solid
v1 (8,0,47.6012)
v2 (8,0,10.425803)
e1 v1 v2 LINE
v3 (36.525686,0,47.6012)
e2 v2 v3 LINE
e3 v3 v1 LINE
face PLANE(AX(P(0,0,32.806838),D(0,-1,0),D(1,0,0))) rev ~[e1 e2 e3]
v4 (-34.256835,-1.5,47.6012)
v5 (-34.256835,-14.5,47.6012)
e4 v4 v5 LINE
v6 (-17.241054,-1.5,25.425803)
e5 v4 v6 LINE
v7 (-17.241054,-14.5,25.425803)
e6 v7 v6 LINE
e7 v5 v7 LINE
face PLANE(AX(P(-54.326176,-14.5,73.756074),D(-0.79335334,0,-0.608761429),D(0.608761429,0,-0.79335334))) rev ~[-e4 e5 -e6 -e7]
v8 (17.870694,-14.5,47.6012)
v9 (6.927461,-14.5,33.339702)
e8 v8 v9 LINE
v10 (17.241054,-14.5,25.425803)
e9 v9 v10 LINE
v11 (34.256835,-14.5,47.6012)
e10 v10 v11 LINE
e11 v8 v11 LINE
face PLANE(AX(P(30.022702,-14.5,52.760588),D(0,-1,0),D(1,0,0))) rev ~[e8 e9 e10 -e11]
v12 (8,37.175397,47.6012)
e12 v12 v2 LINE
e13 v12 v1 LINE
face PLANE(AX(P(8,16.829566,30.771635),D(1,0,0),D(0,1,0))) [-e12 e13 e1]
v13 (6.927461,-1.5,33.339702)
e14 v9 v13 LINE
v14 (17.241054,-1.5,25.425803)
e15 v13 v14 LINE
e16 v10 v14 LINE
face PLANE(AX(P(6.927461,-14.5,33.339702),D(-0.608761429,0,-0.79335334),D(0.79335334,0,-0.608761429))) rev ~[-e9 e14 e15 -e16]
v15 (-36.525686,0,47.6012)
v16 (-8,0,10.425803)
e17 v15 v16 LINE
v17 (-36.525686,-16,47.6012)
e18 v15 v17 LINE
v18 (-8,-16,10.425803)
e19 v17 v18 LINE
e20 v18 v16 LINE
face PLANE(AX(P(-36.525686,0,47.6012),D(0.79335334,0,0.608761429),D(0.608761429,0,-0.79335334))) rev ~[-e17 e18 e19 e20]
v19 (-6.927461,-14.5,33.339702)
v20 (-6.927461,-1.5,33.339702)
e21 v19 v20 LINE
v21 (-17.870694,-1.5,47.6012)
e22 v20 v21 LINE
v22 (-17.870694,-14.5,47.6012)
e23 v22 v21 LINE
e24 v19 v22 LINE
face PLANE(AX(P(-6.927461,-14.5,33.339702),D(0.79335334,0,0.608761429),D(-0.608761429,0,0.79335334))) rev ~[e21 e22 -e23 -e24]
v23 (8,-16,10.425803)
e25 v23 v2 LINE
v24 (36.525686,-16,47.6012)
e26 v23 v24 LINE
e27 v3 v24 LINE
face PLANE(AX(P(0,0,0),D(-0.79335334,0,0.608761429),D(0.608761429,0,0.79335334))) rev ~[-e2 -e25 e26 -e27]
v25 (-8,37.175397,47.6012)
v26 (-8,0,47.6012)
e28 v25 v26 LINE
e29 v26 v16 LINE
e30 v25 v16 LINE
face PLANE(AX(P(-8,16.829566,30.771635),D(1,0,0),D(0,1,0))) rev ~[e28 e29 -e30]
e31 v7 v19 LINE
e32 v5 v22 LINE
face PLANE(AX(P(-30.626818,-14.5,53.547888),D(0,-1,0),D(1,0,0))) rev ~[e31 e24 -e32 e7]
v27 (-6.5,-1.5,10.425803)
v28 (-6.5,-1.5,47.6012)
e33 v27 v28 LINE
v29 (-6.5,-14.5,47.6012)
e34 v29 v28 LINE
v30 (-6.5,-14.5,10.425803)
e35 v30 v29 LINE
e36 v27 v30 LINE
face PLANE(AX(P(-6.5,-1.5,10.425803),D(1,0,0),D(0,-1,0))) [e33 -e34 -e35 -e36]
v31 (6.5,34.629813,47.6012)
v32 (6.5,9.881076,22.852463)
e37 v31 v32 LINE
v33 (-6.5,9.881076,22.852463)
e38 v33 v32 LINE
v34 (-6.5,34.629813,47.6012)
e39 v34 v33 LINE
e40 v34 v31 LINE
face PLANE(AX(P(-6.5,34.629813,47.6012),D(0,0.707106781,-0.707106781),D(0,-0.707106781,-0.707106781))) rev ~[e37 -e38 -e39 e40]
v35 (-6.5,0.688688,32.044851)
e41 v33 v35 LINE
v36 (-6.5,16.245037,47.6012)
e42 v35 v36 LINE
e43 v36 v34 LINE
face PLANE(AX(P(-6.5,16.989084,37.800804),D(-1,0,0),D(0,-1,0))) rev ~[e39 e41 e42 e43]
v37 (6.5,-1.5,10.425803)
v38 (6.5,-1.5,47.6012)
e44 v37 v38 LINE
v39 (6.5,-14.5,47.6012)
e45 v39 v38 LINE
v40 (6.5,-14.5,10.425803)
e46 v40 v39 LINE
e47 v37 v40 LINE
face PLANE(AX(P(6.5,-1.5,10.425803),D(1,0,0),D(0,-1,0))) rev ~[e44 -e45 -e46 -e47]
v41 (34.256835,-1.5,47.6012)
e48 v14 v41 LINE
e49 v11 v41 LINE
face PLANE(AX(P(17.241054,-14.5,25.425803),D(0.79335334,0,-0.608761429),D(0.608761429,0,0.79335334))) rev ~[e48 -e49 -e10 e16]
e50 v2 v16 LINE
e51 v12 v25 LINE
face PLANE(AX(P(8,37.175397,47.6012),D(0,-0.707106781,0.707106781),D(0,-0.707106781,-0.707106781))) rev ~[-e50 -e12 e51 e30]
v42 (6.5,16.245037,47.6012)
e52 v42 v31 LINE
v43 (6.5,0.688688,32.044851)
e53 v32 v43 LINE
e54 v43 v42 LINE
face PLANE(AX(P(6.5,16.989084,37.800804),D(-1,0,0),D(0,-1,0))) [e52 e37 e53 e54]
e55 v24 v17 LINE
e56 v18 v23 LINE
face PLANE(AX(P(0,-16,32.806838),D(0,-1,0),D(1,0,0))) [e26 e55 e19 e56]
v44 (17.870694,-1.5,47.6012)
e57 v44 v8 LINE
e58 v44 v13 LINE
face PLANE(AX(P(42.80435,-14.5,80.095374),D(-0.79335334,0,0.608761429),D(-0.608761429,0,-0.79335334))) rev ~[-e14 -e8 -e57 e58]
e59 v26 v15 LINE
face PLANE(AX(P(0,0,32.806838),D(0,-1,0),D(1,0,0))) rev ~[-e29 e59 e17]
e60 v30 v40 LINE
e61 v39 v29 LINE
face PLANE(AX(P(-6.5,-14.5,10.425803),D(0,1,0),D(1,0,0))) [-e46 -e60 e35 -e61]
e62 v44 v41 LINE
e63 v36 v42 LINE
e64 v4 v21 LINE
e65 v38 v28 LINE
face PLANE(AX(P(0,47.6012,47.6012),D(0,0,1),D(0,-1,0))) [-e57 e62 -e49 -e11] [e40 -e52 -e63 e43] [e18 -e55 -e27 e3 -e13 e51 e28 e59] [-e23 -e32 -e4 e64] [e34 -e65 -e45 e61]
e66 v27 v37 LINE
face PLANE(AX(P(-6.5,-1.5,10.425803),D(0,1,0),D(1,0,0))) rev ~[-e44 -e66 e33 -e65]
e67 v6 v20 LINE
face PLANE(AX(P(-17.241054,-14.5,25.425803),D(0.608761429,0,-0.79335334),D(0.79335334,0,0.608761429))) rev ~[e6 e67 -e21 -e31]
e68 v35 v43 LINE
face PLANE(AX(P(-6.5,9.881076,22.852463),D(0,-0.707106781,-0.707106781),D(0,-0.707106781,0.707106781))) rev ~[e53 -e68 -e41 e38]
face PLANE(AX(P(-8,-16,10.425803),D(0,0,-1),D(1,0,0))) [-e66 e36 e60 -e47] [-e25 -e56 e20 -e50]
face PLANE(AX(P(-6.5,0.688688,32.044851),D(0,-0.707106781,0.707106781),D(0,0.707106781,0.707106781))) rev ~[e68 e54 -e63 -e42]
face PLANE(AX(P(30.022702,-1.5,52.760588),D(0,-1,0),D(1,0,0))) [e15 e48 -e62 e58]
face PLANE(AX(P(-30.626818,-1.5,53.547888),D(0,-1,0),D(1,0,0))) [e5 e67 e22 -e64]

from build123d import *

# Parameters (mm, degrees)
F1_DEPTH      = 16
F3_DEPTH      = 8
F3_DEPTH_BACK = 8
F4_W          = 16
F4_H          = 10.4258029827
F5_DEPTH      = 45.4
F7_DEPTH      = 25
F9_START      = -1.5
F9_DEPTH      = 13
F11_START     = -1.5
F11_DEPTH     = 13
F12_W         = 13
F12_H         = 13
F13_DEPTH     = 45.8


# Not quite as in the source:
# - a feature of the source that left no trace in its solid (it failed there, or was rolled back) is left out


with BuildPart() as f1:
    # F0 (on Front) → F1 (new body)
    with BuildSketch(Plane.XZ):
        Polygon((-36.5256857405, 47.6012004175), (0, 0), (36.5256857405, 47.6012004175), align=None)
    extrude(amount=F1_DEPTH)

    # F2 (on Right) → F3 (join, two sides)
    with BuildSketch(Plane.YZ) as f3_sk:
        Polygon((0, 47.6012004175), (0, 0), (47.6012004175, 47.6012004175), align=None)
    extrude(amount=F3_DEPTH)
    extrude(f3_sk.sketch, amount=-F3_DEPTH_BACK)

    # F4 (on face) → F5 (cut)
    with BuildSketch(Plane.XZ.offset(16)):
        with Locations((0, 5.2129014914)):
            Rectangle(F4_W, F4_H)
    extrude(amount=-F5_DEPTH, mode=Mode.SUBTRACT)

    # F6 (on face) → F7 (cut)
    with BuildSketch(Plane.YZ.offset(8)):
        Polygon((37.1753974347, 47.6012004175), (0, 10.4258029827), (10.4258029827, 10.4258029827), (47.6012004175, 47.6012004175), align=None)
    extrude(amount=-F7_DEPTH, mode=Mode.SUBTRACT)

    # F8 (on face) → F9 (cut)
    with BuildSketch(Plane.XZ.offset(16).offset(F9_START)):
        Polygon((-54.3261755364, 73.7560737056), (-17.2410544745, 25.4258029827), (-6.9274610507, 33.3397015598), (-44.0125821126, 81.6699722827), align=None)
        Polygon((6.9274610507, 33.3397015598), (17.2410544745, 25.4258029827), (53.1179434037, 72.181474934), (42.8043499799, 80.0953735111), align=None)
    extrude(amount=-F9_DEPTH, mode=Mode.SUBTRACT)

    # F10 (on face) → F11 (cut)
    with BuildSketch(Plane(origin=(-8, 0, 0), x_dir=(0, -1, 0), z_dir=(-1, 0, 0)).offset(F11_START)):
        Polygon((-16.2450367116, 47.6012004175), (-34.6298130225, 47.6012004175), (-9.8810756809, 22.8524630759), (-0.6886875255, 32.0448512314), align=None)
    extrude(amount=-F11_DEPTH, mode=Mode.SUBTRACT)

    # F12 (on face) → F13 (cut)
    with BuildSketch(Plane(origin=(0, 0, 10.4258029827), x_dir=(1, 0, 0), z_dir=(0, 0, -1))):
        with Locations((0, 8)):
            Rectangle(F12_W, F12_H)
    extrude(amount=-F13_DEPTH, mode=Mode.SUBTRACT)


solid = f1.part
